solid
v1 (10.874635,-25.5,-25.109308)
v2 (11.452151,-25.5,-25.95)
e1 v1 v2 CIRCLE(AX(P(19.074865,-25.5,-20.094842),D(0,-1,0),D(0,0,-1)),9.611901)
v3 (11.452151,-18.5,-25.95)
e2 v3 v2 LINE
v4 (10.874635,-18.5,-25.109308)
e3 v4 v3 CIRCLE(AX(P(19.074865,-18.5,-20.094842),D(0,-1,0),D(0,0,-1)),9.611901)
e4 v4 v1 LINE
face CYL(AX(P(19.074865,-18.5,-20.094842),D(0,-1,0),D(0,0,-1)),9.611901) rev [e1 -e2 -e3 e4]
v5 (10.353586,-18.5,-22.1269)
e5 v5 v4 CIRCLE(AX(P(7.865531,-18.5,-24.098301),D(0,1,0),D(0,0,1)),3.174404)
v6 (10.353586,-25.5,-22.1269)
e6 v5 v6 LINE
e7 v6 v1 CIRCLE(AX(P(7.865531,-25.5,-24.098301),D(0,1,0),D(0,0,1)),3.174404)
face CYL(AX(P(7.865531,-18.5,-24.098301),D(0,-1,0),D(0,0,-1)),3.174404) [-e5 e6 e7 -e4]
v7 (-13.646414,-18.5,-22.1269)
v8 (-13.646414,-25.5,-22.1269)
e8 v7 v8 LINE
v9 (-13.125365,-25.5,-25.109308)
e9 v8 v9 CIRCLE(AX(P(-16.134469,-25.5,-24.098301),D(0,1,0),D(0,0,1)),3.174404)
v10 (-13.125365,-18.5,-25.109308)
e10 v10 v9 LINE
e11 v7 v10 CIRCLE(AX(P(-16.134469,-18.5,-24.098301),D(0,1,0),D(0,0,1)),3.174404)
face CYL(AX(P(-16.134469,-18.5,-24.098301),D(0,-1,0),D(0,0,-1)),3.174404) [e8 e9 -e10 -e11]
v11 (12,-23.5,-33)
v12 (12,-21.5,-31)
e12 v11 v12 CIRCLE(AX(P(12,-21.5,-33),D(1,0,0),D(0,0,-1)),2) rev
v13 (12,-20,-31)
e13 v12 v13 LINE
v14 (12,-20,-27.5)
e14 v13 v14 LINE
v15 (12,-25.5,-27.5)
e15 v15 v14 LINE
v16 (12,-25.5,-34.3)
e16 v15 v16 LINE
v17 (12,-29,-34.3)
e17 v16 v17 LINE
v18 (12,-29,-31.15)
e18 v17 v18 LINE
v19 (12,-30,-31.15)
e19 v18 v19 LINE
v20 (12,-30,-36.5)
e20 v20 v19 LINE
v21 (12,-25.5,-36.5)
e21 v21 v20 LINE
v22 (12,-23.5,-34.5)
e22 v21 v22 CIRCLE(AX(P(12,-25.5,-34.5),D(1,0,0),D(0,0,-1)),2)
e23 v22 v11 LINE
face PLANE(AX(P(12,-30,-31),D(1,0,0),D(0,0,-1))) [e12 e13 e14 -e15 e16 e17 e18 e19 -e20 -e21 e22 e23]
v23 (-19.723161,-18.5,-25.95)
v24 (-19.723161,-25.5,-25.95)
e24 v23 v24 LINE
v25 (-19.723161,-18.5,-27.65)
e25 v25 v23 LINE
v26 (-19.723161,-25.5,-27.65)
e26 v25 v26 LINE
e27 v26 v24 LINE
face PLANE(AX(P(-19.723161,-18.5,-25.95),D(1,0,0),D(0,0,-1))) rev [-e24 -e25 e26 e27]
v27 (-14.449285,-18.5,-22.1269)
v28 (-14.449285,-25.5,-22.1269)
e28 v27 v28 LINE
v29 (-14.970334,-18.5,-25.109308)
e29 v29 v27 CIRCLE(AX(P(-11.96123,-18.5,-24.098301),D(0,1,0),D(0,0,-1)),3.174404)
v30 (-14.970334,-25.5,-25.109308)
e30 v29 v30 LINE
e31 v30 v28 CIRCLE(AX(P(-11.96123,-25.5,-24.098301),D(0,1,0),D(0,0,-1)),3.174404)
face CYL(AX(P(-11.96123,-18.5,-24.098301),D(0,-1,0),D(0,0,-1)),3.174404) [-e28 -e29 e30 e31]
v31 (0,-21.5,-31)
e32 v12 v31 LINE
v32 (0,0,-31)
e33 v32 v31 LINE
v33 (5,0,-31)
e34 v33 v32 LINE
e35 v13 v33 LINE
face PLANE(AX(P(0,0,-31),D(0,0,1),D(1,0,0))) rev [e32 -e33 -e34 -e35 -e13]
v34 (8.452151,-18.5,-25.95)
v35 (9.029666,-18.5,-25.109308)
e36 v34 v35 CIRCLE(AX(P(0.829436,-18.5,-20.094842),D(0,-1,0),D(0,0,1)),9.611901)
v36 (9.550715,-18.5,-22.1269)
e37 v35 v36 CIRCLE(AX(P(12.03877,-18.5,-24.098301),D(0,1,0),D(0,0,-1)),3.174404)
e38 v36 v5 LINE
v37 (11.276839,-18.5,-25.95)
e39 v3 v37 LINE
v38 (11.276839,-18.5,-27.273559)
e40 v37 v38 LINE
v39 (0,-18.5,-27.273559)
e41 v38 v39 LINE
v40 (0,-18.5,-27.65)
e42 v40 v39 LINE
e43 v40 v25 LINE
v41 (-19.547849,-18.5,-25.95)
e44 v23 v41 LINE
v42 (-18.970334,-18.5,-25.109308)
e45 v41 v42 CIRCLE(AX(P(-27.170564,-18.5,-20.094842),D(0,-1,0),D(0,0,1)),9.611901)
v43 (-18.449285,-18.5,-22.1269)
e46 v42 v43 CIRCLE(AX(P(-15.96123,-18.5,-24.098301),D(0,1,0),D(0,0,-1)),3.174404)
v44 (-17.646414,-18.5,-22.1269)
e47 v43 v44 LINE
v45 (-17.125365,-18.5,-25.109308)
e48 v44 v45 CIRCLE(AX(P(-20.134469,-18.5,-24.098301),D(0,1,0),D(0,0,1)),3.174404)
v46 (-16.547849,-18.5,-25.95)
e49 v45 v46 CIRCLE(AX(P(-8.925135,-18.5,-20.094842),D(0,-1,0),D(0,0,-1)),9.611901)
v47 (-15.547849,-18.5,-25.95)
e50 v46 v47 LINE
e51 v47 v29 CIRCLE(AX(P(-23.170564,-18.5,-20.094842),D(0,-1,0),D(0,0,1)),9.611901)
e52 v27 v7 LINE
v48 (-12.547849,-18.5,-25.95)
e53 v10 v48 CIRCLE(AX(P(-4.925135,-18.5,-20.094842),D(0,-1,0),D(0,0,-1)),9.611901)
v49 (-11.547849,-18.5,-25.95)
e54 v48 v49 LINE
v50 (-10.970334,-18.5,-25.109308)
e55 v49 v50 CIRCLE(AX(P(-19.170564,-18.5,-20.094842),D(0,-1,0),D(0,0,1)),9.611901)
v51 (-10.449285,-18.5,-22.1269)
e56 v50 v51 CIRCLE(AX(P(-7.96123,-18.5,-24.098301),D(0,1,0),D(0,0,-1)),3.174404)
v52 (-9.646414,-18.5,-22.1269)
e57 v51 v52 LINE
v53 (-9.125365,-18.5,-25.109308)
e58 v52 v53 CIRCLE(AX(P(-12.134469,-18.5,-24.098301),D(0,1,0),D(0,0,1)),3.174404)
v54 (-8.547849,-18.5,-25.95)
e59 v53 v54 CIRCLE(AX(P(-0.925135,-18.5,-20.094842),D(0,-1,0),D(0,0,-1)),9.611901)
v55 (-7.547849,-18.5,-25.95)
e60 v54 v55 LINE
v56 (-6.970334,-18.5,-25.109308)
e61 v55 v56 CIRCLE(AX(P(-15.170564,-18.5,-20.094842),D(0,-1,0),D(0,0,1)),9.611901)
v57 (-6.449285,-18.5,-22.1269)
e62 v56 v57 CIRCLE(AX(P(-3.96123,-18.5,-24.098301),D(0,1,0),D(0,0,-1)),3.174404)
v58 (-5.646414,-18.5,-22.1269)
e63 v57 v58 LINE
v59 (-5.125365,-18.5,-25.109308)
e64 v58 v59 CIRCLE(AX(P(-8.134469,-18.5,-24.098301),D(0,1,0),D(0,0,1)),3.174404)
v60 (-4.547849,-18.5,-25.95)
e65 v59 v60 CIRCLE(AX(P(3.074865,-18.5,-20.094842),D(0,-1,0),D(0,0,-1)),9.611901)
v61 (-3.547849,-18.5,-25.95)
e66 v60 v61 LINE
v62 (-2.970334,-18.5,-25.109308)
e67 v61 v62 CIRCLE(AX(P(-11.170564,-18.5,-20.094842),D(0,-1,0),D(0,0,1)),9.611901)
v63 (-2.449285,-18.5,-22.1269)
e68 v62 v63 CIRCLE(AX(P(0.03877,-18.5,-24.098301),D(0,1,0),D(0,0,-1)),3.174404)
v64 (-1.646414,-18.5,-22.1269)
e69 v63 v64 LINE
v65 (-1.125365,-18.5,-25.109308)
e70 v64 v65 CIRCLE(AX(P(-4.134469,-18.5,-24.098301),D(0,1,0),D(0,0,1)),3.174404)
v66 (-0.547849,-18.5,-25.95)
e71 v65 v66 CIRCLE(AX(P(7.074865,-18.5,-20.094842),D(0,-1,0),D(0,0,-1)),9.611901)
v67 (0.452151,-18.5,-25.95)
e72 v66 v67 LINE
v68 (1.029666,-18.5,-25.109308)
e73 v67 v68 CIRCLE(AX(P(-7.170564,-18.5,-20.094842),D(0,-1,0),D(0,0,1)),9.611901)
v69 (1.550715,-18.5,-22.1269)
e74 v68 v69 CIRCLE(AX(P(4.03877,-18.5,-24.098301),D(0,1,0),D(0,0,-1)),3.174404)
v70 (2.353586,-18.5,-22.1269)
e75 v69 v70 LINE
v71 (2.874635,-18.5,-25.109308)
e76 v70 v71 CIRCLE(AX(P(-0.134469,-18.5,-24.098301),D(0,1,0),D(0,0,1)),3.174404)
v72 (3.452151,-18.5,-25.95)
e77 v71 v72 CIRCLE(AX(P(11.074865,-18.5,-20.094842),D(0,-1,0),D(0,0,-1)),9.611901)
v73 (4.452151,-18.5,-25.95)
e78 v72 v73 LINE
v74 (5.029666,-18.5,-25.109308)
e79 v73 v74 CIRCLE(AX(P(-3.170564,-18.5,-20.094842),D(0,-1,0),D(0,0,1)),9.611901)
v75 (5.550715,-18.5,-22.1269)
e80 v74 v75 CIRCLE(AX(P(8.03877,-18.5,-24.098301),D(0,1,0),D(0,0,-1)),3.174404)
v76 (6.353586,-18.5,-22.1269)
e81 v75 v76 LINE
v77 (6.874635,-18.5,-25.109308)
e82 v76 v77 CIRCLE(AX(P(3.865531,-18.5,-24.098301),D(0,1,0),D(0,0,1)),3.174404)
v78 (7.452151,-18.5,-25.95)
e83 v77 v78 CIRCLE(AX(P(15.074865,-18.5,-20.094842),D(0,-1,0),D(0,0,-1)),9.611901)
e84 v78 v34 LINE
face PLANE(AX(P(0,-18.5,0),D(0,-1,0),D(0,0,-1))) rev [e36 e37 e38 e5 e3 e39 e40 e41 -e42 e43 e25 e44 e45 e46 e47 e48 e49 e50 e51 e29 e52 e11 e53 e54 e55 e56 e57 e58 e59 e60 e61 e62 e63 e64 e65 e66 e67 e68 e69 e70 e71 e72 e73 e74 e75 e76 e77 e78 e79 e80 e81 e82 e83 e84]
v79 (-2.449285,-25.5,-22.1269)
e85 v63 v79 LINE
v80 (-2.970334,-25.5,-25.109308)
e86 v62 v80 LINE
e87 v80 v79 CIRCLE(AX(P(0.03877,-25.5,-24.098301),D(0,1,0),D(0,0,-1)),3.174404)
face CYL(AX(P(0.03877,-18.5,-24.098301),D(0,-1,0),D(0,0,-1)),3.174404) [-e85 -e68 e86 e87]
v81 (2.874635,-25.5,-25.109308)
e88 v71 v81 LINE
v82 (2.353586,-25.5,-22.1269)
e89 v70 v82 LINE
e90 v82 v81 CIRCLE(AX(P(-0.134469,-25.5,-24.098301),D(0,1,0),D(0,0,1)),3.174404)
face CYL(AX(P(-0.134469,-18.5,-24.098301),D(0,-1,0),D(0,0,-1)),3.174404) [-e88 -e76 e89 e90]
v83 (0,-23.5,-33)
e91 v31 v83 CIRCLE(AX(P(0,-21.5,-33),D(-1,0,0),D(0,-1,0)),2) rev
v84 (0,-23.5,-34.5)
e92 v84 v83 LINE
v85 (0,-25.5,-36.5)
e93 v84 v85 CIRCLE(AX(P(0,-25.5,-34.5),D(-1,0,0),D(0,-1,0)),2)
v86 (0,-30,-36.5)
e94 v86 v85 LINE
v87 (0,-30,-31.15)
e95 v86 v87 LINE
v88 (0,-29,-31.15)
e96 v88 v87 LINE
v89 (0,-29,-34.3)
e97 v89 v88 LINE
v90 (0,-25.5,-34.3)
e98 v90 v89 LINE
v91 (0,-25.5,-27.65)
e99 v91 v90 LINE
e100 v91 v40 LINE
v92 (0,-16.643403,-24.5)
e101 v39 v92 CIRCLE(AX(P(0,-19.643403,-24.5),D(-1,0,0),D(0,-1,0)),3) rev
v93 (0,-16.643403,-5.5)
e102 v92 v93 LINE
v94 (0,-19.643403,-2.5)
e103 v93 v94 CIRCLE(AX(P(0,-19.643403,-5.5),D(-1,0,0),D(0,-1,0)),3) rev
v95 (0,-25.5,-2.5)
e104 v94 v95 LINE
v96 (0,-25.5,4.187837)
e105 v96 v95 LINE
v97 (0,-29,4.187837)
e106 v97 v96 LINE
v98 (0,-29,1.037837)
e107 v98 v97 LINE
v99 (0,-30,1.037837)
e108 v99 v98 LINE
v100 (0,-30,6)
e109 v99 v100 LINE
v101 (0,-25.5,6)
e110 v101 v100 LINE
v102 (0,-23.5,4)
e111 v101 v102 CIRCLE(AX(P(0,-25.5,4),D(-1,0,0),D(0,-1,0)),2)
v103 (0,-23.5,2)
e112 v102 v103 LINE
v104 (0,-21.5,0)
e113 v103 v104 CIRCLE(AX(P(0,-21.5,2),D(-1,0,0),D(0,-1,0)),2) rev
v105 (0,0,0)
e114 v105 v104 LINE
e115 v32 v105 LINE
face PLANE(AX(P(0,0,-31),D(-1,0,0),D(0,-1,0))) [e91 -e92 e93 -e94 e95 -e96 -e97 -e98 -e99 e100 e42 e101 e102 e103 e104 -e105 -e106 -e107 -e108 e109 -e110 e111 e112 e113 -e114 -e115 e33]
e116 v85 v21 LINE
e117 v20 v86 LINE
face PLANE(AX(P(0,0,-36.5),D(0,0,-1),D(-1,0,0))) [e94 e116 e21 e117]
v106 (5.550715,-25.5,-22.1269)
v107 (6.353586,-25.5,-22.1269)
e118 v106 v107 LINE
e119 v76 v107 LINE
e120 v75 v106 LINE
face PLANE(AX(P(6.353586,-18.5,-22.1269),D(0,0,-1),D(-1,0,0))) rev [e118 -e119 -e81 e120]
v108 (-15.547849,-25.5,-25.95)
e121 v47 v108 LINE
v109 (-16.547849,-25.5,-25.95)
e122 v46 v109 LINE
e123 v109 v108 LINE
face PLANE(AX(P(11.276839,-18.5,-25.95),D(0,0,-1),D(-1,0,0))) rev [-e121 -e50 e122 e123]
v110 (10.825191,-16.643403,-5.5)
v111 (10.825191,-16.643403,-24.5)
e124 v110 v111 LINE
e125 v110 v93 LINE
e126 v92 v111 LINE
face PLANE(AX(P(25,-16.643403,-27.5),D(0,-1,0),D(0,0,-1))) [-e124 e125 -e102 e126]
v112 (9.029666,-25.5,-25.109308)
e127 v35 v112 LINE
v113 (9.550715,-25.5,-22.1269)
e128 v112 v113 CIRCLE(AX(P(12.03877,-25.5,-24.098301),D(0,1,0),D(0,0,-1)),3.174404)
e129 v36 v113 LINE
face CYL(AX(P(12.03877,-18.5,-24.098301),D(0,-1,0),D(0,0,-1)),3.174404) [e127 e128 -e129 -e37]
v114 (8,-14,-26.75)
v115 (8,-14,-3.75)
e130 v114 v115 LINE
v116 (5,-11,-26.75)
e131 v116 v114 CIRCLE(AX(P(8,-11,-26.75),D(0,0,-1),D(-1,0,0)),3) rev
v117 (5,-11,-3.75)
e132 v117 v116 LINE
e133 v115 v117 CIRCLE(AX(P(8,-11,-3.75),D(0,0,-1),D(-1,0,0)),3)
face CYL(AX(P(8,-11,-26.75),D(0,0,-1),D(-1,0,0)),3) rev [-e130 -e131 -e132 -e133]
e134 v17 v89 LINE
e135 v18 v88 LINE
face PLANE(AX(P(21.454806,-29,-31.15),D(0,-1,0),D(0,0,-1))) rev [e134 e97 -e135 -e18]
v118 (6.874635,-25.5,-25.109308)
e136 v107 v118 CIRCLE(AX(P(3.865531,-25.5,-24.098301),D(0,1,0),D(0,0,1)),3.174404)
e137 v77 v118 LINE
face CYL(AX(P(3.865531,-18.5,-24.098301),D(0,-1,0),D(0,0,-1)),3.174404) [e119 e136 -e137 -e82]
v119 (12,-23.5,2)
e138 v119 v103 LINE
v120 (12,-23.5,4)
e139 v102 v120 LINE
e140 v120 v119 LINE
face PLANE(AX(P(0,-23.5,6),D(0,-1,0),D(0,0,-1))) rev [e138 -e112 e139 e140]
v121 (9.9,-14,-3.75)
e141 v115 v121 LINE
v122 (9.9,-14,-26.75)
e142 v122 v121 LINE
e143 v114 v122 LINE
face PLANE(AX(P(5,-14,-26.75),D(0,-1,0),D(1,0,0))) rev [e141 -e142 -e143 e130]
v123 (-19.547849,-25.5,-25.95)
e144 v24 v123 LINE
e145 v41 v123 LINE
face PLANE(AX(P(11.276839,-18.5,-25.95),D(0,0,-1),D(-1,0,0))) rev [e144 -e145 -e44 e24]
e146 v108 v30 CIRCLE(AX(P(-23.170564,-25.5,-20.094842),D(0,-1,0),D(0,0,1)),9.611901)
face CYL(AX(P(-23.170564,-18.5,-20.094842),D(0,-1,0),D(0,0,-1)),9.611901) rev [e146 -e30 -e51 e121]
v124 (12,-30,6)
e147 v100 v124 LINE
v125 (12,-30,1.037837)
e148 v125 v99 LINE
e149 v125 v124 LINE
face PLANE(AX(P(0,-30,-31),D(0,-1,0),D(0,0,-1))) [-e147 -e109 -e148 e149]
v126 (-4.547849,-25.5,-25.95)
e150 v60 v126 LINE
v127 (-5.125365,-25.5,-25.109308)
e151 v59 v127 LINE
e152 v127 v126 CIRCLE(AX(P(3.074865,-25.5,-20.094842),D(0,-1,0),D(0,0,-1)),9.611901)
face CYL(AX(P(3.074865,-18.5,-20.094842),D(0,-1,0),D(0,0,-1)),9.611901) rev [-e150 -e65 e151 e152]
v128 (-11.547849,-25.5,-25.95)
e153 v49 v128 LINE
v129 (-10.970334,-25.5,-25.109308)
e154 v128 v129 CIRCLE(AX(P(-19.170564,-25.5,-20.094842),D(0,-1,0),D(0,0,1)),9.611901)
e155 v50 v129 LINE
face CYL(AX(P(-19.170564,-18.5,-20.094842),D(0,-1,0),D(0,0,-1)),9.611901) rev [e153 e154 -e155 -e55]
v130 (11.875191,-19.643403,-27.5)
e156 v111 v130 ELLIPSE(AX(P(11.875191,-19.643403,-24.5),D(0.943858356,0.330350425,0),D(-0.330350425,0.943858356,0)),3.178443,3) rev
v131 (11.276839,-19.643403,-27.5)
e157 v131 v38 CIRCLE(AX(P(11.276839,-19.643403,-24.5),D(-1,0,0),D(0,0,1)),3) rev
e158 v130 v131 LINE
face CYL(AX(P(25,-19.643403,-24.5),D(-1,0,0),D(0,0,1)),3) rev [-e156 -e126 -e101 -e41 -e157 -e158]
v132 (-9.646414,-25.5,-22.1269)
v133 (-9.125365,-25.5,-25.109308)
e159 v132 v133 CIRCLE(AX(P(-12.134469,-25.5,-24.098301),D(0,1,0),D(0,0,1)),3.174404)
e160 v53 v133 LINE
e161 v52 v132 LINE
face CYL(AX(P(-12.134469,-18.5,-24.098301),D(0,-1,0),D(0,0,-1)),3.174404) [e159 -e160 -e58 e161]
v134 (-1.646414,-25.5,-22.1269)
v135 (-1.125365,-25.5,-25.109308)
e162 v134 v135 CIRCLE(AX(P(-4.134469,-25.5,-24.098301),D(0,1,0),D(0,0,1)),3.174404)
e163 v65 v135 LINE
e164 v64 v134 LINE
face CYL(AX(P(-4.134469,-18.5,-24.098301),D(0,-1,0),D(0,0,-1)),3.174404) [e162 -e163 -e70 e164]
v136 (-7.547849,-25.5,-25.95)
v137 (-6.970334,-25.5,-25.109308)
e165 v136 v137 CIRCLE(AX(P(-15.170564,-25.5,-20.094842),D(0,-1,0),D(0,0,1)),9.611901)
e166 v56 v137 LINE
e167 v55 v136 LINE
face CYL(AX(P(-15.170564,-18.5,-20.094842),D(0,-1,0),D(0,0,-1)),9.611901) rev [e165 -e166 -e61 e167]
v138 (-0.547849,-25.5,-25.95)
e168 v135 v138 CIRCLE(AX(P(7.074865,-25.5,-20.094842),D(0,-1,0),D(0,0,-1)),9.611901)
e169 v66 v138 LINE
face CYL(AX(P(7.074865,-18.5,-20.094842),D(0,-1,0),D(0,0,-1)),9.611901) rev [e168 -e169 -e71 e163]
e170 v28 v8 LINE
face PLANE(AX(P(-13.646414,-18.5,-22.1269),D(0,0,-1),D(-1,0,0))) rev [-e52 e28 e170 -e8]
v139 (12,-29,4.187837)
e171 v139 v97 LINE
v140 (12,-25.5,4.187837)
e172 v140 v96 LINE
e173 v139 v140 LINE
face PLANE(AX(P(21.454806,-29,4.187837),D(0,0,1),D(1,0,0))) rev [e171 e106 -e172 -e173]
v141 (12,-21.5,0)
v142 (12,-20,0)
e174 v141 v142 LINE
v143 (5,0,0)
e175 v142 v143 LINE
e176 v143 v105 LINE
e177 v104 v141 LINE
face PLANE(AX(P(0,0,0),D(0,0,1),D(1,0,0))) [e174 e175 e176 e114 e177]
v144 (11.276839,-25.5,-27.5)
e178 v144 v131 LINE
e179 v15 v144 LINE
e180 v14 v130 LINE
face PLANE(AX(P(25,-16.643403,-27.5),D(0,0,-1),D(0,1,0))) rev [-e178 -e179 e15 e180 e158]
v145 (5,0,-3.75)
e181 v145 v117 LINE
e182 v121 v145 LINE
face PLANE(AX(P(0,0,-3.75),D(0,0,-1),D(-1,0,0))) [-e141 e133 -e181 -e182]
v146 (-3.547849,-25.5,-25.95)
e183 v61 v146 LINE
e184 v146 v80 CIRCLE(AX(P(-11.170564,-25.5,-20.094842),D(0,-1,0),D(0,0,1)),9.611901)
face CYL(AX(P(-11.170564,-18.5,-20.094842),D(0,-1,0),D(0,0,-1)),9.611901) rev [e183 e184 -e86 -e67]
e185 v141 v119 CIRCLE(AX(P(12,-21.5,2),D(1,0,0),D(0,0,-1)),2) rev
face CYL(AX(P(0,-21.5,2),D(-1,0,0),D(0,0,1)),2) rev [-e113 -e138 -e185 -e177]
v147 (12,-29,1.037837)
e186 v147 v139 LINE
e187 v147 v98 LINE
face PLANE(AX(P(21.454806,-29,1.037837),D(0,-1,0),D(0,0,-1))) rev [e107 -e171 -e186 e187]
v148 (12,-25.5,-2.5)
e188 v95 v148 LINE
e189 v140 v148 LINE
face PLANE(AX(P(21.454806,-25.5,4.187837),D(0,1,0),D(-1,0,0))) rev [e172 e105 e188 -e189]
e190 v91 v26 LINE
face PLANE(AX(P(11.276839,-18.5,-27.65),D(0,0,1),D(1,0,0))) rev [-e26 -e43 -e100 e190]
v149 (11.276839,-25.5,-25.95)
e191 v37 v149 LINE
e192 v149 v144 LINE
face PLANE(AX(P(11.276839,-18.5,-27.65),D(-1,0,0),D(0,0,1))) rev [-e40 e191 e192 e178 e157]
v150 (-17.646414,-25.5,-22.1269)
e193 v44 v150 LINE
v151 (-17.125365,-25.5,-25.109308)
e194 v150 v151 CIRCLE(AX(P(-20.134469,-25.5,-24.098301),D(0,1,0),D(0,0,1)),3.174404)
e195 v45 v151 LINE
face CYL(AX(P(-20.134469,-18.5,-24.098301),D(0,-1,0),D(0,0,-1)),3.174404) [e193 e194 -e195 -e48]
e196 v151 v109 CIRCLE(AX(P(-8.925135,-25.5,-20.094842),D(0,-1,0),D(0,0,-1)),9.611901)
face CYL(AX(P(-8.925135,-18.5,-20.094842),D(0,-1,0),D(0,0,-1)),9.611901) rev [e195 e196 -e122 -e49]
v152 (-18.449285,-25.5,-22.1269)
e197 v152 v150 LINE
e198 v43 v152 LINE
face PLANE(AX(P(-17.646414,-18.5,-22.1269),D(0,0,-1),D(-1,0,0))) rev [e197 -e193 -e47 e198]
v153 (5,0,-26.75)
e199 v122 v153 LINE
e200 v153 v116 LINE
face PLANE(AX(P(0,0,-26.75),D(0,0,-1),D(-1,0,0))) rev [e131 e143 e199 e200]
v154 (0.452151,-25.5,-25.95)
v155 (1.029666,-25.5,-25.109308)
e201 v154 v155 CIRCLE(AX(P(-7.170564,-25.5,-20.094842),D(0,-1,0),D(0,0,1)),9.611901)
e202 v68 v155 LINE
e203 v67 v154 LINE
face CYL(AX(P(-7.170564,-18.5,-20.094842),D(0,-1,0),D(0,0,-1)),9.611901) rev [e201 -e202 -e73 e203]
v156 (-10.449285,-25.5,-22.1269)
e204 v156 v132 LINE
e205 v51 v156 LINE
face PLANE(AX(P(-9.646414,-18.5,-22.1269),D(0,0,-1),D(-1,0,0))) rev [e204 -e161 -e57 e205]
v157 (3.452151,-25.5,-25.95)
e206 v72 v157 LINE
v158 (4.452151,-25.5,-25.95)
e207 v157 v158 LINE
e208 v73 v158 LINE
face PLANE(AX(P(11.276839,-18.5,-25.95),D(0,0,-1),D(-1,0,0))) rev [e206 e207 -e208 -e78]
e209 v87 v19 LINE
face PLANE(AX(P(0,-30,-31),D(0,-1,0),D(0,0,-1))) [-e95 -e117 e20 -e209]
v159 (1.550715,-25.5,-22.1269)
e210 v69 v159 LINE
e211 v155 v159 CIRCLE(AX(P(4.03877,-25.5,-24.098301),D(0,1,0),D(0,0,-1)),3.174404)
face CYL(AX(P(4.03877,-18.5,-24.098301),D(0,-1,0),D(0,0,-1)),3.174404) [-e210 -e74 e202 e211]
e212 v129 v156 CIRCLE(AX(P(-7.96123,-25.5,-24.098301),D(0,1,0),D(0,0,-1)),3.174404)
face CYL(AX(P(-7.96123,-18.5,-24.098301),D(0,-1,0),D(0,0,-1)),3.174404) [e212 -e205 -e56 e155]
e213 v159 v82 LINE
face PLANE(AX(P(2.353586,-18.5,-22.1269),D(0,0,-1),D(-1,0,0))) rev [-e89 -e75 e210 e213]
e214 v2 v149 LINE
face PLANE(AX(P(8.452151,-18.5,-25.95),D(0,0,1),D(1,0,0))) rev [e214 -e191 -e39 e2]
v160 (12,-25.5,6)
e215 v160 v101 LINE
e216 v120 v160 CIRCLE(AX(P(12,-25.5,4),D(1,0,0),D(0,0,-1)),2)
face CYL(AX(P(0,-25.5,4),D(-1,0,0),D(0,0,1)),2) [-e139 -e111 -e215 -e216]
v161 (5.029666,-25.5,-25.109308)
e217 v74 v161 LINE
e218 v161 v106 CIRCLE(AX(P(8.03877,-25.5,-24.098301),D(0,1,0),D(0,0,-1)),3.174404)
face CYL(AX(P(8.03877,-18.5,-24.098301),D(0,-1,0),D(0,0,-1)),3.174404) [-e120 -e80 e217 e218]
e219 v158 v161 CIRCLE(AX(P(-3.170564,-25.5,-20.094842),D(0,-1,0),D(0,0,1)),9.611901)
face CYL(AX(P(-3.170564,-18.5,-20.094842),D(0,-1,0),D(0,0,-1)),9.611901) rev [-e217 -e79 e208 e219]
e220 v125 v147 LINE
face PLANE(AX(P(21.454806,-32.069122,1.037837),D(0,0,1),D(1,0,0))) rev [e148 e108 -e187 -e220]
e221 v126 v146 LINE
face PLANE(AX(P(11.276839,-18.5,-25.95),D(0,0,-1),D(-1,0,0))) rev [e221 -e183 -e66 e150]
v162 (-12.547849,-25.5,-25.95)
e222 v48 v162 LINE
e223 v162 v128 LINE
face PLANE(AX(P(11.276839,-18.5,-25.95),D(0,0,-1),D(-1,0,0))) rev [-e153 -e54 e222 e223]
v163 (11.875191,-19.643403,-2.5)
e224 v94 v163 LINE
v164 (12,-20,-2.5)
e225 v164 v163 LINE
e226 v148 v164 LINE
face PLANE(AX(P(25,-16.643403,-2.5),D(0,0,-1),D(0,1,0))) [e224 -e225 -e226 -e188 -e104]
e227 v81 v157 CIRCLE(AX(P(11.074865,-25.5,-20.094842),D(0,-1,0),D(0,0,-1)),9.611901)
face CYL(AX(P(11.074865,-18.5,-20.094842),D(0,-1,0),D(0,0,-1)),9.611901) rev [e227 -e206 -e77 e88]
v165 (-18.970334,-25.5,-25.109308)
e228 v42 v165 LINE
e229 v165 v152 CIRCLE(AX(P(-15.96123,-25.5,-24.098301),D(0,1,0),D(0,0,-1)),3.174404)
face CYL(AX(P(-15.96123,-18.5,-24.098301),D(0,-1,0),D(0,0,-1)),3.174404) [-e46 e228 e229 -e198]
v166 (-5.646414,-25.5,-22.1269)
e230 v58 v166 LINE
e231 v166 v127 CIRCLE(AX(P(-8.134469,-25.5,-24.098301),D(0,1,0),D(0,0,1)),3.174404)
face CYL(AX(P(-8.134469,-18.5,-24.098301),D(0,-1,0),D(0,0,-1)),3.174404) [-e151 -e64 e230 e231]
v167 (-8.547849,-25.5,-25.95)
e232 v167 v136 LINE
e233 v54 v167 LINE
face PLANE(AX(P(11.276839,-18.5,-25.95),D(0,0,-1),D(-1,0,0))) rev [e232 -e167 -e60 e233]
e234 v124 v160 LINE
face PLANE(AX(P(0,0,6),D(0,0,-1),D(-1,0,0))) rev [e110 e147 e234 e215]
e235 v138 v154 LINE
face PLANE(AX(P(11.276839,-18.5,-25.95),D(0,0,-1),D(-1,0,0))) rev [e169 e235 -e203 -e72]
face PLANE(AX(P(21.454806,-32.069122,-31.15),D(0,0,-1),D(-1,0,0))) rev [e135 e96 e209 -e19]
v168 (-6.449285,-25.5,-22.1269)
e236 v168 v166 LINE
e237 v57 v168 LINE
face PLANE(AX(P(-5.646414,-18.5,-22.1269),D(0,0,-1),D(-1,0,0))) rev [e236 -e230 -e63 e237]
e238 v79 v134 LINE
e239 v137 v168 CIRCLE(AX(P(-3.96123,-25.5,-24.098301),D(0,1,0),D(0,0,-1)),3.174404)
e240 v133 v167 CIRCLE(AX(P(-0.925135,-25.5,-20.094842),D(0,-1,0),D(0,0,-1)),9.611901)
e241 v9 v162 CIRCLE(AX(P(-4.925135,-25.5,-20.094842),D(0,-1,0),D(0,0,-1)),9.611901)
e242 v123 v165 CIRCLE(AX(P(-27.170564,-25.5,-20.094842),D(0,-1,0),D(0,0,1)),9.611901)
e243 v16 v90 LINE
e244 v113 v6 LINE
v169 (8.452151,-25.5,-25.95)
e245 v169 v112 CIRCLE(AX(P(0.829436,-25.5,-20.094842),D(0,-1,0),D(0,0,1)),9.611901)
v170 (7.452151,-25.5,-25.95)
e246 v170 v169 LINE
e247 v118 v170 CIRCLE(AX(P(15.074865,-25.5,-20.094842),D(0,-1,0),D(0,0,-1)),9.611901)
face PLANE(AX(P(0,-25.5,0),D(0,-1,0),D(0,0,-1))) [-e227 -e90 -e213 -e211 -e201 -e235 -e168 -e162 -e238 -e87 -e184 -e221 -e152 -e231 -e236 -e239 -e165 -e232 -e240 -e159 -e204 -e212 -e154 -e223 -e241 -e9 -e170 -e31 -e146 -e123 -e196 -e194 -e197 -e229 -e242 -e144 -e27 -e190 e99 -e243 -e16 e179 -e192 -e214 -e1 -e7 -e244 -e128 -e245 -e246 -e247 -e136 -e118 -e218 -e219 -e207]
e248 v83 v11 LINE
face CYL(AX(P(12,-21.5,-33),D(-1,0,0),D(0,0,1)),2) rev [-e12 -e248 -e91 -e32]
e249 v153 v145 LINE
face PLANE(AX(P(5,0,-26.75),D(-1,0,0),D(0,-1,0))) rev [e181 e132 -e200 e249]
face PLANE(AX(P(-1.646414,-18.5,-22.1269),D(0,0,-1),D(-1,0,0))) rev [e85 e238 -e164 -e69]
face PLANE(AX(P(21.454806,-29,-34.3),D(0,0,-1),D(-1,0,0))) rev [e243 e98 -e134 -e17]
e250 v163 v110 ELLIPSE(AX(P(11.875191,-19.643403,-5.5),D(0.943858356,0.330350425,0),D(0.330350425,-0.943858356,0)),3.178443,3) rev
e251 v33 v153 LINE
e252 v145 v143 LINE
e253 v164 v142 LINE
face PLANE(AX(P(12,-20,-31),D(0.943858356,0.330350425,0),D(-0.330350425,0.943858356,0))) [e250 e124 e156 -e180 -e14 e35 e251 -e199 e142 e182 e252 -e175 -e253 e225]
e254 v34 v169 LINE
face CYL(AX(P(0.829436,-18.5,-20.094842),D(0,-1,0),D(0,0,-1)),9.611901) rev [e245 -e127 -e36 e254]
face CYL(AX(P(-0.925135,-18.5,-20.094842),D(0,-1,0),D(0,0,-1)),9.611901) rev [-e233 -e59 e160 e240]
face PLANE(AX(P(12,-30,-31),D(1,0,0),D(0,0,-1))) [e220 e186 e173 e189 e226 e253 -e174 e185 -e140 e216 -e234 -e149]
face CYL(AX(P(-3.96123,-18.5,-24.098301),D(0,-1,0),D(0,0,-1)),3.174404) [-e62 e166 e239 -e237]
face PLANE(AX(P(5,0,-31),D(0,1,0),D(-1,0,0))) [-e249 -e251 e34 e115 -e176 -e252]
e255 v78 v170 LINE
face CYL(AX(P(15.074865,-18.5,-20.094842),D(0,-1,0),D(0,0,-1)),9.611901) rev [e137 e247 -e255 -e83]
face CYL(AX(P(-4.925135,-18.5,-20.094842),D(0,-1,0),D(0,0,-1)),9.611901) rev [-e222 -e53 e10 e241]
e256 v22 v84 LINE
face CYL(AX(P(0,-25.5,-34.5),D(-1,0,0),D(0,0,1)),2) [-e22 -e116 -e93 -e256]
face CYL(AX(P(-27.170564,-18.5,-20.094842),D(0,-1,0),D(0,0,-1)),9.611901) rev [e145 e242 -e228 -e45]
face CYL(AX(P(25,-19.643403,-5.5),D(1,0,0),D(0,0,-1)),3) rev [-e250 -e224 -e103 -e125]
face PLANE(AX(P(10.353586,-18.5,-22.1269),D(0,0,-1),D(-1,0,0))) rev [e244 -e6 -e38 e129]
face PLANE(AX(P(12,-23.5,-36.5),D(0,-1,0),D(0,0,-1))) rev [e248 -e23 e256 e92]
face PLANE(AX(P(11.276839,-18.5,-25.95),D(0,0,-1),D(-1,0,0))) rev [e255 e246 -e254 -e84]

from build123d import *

# Parameters (mm, degrees)
BOSS_EXTRUDE1_DEPTH = 31
SKETCH4_W           = 25
SKETCH4_H           = 15
CUT_EXTRUDE2_DEPTH  = 25
CUT_EXTRUDE4_DEPTH  = 11.5
SKETCH7_W           = 31
SKETCH7_H           = 1.7
BOSS_EXTRUDE3_DEPTH = 7
BOSS_EXTRUDE4_DEPTH = 7
LPATTERN1_COUNT     = 8
LPATTERN1_PITCH     = 4
SKETCH11_W          = 12
SKETCH11_H          = 6.5
BOSS_EXTRUDE5_DEPTH = 5.5
FILLET5_R           = 3
SKETCH12_W          = 12
SKETCH12_H          = 6.5
BOSS_EXTRUDE6_DEPTH = 6
CUT_EXTRUDE5_DEPTH  = 12
FILLET6_R           = 2


with BuildPart() as part:
    # Sketch1 → Boss-Extrude1 (new body)
    with BuildSketch(Plane.XY):
        Polygon((0, 0), (0, -30), (12, -30), (12, -20), (5, 0), align=None)
    extrude(amount=-BOSS_EXTRUDE1_DEPTH)

    # Sketch4 → Cut-Extrude2 (cut)
    with BuildSketch(Plane.ZY):
        with Locations((-15, -24.143402944)):
            Rectangle(SKETCH4_W, SKETCH4_H)
    extrude(amount=-CUT_EXTRUDE2_DEPTH, mode=Mode.SUBTRACT)

    # Sketch6 → Cut-Extrude4 (cut, symmetric)
    with BuildSketch(Plane.XY.offset(-15.25)):
        Polygon((5, 0), (5, -14), (9.9, -14), align=None)
    extrude(amount=CUT_EXTRUDE4_DEPTH, both=True, mode=Mode.SUBTRACT)

    # Sketch7 → Boss-Extrude3 (add)
    with BuildSketch(Plane(origin=(0, -25.5, 0), x_dir=(1, 0, 0), z_dir=(0, 1, 0))):
        with Locations((-4.2231607, 26.8)):
            Rectangle(SKETCH7_W, SKETCH7_H)
    extrude(amount=BOSS_EXTRUDE3_DEPTH)

    # Sketch10 → Boss-Extrude4 (add)
    with BuildSketch(Plane(origin=(0, -25.5, 0), x_dir=(1, 0, 0), z_dir=(0, 1, 0))):
        with BuildLine():
            Line((10.353586314, 22.126900466), (9.550714712, 22.126900466))
            ThreePointArc((9.550714712, 22.126900466), (8.911730102, 23.551984668), (9.029666421, 25.109308443))
            ThreePointArc((9.029666421, 25.109308443), (8.752067329, 25.53731984), (8.452150513, 25.95))
            Line((8.452150513, 25.95), (11.452150513, 25.95))
            ThreePointArc((11.452150513, 25.95), (11.152233697, 25.53731984), (10.874634605, 25.109308443))
            ThreePointArc((10.874634605, 25.109308443), (10.992570924, 23.551984668), (10.353586314, 22.126900466))
        make_face()
    boss_extrude4 = extrude(amount=BOSS_EXTRUDE4_DEPTH)

    # LPattern1: Boss-Extrude4 ×8
    with Locations(*[(-i * LPATTERN1_PITCH, 0, 0) for i in range(1, LPATTERN1_COUNT)]):
        add(boss_extrude4)

    # Sketch11 → Boss-Extrude5 (add)
    with BuildSketch(Plane(origin=(0, 0, -31), x_dir=(-1, 0, 0), z_dir=(0, 0, -1))):
        with Locations((-6, -26.75)):
            Rectangle(SKETCH11_W, SKETCH11_H)
    extrude(amount=BOSS_EXTRUDE5_DEPTH)

    # Fillet5
    # the kernel refuses this fillet: 3 mm, written as the material it adds along each edge
    with BuildSketch(Plane(origin=(5, -14, -34.25), x_dir=(0, 1, 0), z_dir=(0, 0, 1))) as fillet5_piece_1_section:
        with BuildLine():
            CenterArc((FILLET5_R, -FILLET5_R), FILLET5_R, 90, 90)
            Line((0, -FILLET5_R), (0, 0))
            Line((0, 0), (FILLET5_R, 0))
        make_face()
    fillet5_piece_1 = extrude(amount=38, mode=Mode.PRIVATE)
    fillet5_piece_1 = split(fillet5_piece_1, bisect_by=Plane(origin=(5.670103817, -13.329896183, -31), z_dir=(0, 0, 1)), keep=Keep.TOP, mode=Mode.PRIVATE)
    fillet5_piece_1 = split(fillet5_piece_1, bisect_by=Plane(origin=(5.670103817, -13.329896183, 0), z_dir=(0, 0, -1)), keep=Keep.TOP, mode=Mode.PRIVATE)
    add(fillet5_piece_1)
    with BuildSketch(Plane(origin=(0, -16.643402944, -2.5), x_dir=(0, -1, 0), z_dir=(1, 0, 0))) as fillet5_piece_2_section:
        with BuildLine():
            CenterArc((FILLET5_R, FILLET5_R), FILLET5_R, 180, 90)
            Line((0, FILLET5_R), (0, 0))
            Line((0, 0), (FILLET5_R, 0))
        make_face()
    fillet5_piece_2 = extrude(amount=18.32519103, mode=Mode.PRIVATE)
    fillet5_piece_2 = split(fillet5_piece_2, bisect_by=Plane(origin=(10.459559167, -15.598740478, -3.164212855), z_dir=(-0.9438583563660173, -0.33035042472810633, 0)), keep=Keep.TOP, mode=Mode.PRIVATE)
    add(fillet5_piece_2)
    with BuildSketch(Plane(origin=(0, -16.643402944, -27.5), x_dir=(0, 0, 1), z_dir=(1, 0, 0))) as fillet5_piece_3_section:
        with BuildLine():
            CenterArc((FILLET5_R, FILLET5_R), FILLET5_R, 180, 90)
            Line((0, FILLET5_R), (0, 0))
            Line((0, 0), (FILLET5_R, 0))
        make_face()
    fillet5_piece_3 = extrude(amount=18.32519103, mode=Mode.PRIVATE)
    fillet5_piece_3 = split(fillet5_piece_3, bisect_by=Plane(origin=(10.435387917, -15.529679764, -26.806522223), z_dir=(-0.9438583563660173, -0.33035042472810633, 0)), keep=Keep.TOP, mode=Mode.PRIVATE)
    add(fillet5_piece_3)

    # Sketch12 → Boss-Extrude6 (add)
    with BuildSketch(Plane.XY):
        with Locations((6, -26.75)):
            Rectangle(SKETCH12_W, SKETCH12_H)
    extrude(amount=BOSS_EXTRUDE6_DEPTH)

    # Sketch13 → Cut-Extrude5 (cut)
    with BuildSketch(Plane.ZY):
        Polygon((-34.3, -25.5), (-27.5, -25.5), (-27.5, -32.069121633), (-31.15, -32.069121633), (-31.15, -29), (-34.3, -29), align=None)
        Polygon((1.037837299, -29), (4.187837299, -29), (4.187837299, -25.5), (-2.612162701, -25.5), (-2.612162701, -32.069121633), (1.037837299, -32.069121633), align=None)
    extrude(amount=-CUT_EXTRUDE5_DEPTH, mode=Mode.SUBTRACT)

    # Fillet6
    fillet6_edges = [part.edges().sort_by_distance(p)[0] for p in [
        (6, -23.5, -31),
        (6, -23.5, -36.5),
        (6, -23.5, 0),
        (6, -23.5, 6),
    ]]
    fillet(fillet6_edges, radius=FILLET6_R)


solid = part.part
